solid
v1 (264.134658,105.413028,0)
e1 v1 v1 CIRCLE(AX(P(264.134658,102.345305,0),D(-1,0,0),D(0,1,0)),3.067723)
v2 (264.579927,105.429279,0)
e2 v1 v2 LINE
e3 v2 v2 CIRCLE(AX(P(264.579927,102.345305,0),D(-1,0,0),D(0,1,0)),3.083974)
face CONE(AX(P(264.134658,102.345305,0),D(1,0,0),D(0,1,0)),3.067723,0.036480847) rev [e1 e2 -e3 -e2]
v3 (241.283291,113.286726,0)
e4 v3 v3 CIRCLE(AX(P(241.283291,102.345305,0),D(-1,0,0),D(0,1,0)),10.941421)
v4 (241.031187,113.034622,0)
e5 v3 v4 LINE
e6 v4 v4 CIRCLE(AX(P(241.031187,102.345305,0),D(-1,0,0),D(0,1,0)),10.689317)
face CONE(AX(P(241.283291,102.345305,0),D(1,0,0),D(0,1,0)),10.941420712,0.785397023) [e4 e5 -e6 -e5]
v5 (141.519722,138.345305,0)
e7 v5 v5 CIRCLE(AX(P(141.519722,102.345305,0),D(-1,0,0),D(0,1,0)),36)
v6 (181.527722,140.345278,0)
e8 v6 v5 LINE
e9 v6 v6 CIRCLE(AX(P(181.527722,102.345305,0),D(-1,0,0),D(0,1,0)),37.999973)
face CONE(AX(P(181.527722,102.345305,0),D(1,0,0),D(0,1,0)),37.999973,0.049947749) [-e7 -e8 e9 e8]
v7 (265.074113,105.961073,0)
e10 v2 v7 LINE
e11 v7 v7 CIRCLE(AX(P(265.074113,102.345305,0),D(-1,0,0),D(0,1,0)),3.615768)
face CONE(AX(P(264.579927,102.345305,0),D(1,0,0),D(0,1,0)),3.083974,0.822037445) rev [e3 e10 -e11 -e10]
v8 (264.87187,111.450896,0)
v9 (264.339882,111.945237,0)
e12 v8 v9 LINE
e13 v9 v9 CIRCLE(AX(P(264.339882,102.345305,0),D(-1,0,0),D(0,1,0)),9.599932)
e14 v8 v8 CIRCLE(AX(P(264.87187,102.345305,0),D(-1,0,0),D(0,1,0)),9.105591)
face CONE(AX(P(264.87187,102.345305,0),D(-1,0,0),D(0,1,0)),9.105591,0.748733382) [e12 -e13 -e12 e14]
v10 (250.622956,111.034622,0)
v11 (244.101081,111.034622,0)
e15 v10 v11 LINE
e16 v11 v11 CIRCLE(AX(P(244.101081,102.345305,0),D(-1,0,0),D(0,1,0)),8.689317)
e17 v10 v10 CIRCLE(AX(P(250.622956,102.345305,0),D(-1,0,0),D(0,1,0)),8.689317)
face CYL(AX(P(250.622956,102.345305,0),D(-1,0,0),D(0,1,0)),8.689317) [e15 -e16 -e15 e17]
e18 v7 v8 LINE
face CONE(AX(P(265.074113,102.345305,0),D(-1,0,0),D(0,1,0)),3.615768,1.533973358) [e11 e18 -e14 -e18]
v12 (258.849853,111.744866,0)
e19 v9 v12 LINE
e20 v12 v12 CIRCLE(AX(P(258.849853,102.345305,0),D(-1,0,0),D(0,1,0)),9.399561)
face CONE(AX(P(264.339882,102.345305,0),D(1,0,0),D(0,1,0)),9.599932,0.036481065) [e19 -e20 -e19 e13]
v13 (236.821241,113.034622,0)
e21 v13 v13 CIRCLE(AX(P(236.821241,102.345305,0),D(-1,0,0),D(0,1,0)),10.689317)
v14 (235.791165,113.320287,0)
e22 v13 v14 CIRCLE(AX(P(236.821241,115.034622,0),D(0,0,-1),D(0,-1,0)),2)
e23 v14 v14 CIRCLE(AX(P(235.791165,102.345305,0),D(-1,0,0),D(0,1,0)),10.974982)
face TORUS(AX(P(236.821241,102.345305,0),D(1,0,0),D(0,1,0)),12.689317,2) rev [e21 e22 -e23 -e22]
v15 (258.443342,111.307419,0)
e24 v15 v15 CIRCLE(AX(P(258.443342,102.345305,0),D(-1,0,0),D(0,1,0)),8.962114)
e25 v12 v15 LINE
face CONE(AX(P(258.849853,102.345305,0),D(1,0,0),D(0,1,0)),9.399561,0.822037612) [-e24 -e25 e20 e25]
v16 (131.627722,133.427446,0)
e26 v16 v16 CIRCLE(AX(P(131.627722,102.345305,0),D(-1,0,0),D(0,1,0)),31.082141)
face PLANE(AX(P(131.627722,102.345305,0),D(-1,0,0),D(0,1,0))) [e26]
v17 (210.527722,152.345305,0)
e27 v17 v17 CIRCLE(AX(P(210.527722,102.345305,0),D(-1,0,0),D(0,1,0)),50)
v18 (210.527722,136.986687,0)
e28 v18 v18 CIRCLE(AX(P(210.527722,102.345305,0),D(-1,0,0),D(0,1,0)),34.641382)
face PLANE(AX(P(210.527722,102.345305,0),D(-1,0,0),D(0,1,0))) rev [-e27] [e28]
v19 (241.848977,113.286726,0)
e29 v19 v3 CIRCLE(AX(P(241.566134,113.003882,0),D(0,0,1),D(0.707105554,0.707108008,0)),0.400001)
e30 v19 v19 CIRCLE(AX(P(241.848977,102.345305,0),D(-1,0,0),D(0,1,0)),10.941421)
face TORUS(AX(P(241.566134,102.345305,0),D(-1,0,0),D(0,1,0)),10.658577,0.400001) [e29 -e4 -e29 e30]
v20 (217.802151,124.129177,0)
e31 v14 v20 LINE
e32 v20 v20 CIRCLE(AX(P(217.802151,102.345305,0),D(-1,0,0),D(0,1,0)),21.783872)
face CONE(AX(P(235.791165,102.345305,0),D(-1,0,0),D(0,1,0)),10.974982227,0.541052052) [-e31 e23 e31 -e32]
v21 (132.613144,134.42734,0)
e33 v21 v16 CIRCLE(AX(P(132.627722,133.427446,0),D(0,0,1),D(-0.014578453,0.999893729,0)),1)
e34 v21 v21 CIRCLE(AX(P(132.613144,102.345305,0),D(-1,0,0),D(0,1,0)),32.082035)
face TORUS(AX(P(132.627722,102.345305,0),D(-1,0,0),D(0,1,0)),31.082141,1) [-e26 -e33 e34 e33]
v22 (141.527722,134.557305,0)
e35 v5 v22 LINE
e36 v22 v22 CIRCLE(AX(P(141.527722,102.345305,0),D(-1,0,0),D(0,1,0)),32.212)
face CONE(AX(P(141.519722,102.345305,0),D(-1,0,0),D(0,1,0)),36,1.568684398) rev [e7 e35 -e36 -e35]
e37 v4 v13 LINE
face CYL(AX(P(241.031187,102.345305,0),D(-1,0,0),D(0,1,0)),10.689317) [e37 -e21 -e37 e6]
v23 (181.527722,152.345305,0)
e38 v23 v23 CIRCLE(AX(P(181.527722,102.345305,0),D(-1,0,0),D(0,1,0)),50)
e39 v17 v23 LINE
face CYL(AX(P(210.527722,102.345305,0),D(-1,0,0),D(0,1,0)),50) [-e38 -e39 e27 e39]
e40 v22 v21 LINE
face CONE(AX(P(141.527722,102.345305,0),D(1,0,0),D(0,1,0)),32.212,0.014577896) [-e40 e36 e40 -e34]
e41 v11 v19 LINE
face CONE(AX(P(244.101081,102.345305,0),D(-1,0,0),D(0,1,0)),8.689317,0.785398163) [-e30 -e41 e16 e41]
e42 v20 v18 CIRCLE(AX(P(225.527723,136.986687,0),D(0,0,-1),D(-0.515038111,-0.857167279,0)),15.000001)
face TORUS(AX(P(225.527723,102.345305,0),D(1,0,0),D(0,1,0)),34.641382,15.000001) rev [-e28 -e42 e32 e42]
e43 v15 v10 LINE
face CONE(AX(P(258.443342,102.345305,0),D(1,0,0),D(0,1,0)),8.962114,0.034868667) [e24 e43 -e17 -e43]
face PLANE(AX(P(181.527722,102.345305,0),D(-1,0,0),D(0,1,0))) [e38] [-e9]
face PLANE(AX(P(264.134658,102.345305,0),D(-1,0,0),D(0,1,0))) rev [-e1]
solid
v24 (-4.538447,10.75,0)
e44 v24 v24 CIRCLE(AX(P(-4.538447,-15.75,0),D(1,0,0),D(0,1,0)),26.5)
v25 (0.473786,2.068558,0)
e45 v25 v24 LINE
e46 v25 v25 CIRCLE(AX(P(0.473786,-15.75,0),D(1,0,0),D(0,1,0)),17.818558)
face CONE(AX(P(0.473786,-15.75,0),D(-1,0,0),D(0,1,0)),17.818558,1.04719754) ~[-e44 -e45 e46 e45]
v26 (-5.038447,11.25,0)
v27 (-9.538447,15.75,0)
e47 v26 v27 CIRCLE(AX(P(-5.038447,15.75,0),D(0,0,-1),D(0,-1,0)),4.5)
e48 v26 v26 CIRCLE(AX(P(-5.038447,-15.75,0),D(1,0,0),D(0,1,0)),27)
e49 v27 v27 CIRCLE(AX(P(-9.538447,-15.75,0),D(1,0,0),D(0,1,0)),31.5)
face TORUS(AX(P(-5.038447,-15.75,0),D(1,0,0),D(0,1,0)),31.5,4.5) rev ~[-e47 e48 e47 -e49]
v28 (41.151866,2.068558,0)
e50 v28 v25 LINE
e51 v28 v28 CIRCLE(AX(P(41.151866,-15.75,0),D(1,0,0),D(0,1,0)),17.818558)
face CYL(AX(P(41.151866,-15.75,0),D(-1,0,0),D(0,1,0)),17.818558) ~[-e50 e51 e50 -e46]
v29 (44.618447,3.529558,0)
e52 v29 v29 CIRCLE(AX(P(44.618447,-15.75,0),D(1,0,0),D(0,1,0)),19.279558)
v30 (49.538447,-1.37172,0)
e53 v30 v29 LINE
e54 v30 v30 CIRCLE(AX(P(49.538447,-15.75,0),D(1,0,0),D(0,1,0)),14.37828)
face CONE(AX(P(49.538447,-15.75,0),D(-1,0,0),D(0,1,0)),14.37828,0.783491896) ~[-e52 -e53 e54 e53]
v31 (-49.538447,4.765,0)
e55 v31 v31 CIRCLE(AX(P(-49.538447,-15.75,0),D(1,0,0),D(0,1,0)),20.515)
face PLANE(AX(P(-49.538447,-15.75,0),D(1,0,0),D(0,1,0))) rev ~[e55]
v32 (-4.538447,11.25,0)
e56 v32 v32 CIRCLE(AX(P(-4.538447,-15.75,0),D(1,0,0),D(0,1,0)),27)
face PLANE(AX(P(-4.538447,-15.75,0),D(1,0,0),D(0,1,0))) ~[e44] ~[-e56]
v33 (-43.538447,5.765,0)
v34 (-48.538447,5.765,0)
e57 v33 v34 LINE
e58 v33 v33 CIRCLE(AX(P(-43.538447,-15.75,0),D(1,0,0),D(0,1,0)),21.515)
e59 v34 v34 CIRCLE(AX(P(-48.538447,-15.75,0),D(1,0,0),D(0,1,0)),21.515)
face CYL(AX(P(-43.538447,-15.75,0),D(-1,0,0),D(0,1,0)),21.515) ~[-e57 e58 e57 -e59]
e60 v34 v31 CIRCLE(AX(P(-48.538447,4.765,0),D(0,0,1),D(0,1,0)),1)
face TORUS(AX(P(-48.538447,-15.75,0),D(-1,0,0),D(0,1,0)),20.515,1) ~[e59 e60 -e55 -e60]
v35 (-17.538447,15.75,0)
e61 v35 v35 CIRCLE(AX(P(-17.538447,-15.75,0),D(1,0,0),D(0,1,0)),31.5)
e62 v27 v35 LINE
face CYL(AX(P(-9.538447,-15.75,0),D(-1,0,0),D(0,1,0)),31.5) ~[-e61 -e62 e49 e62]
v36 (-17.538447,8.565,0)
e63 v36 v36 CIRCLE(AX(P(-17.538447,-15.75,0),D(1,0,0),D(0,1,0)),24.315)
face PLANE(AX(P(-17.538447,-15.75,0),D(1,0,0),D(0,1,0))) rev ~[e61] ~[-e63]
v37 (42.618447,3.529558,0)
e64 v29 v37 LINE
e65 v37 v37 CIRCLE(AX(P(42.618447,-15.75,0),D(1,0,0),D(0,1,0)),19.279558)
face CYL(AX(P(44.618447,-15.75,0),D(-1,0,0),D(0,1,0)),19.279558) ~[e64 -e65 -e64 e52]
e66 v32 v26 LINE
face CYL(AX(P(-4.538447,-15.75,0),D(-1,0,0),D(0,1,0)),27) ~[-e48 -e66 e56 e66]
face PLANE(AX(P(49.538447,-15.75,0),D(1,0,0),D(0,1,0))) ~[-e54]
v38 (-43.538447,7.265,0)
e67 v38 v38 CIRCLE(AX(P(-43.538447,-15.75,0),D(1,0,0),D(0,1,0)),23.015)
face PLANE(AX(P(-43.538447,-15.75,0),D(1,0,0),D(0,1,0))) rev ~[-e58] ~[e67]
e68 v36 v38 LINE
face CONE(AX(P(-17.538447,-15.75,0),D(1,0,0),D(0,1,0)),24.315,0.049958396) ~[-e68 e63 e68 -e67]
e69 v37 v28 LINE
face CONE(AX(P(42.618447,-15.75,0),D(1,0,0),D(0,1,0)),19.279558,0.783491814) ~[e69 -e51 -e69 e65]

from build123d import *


# Not quite as in the source:
# - ends of sketch curves that miss each other by under 0.0002 mm in the source are joined


with BuildPart() as f1:
    # F0 (on Top) → F1 (revolve)
    with BuildSketch(Plane.XY):
        with BuildLine():
            Line((210.527722, 136.986687), (210.527722, 152.345305))
            Line((210.527722, 152.345305), (181.527722, 152.345305))
            Line((181.527722, 152.345305), (181.527722, 140.345278))
            Line((181.527722, 140.345278), (141.519722, 138.345305))
            Line((141.519722, 138.345305), (141.527722, 134.557305))
            Line((141.527722, 134.557305), (132.613144, 134.42734))
            ThreePointArc((132.613144, 134.42734), (131.9154797673, 134.1293797589), (131.627722, 133.427446))
            Line((131.627722, 133.427446), (131.627722, 102.345305))
            Line((131.627722, 102.345305), (264.134658, 102.345305))
            Line((264.134658, 102.345305), (264.134658, 105.413028))
            Line((264.134658, 105.413028), (264.579927, 105.429279))
            Line((264.579927, 105.429279), (265.074113, 105.961073))
            Line((265.074113, 105.961073), (264.87187, 111.450896))
            Line((264.87187, 111.450896), (264.339882, 111.945237))
            Line((264.339882, 111.945237), (258.849853, 111.744866))
            Line((258.849853, 111.744866), (258.443342, 111.307419))
            Line((258.443342, 111.307419), (250.622956, 111.034622))
            Line((250.622956, 111.034622), (244.101081, 111.034622))
            Line((244.101081, 111.034622), (241.848977, 113.286726))
            ThreePointArc((241.848977, 113.286726), (241.566134, 113.403883), (241.2832912875, 113.2867257125))
            Line((241.2832912875, 113.2867257125), (241.031187, 113.034622))
            Line((241.031187, 113.034622), (236.821241, 113.034622))
            ThreePointArc((236.821241, 113.034622), (236.2867644086, 113.107361049), (235.7911651362, 113.3202872267))
            Line((235.7911651362, 113.3202872267), (217.802151, 124.129177))
            ThreePointArc((217.802151, 124.129177), (212.4723866491, 129.6003334426), (210.527722, 136.986687))
        make_face()
    revolve(axis=Axis((197.88119, 102.345305, 0), (-1, 0, 0)))


with BuildPart() as f3:
    # F2 (on Top) → F3 (revolve)
    with BuildSketch(Plane.XY):
        with BuildLine():
            Line((-49.538447, 4.765), (-49.538447, -15.75))
            Line((-49.538447, -15.75), (49.538447, -15.75))
            Line((49.538447, -15.75), (49.538447, -1.37172))
            Line((49.538447, -1.37172), (44.618447, 3.529558))
            Line((44.618447, 3.529558), (42.618447, 3.529558))
            Line((42.618447, 3.529558), (41.151866, 2.068558))
            Line((41.151866, 2.068558), (0.473786, 2.068558))
            Line((0.473786, 2.068558), (-4.538447, 10.75))
            Line((-4.538447, 10.75), (-4.538447, 11.25))
            Line((-4.538447, 11.25), (-5.038447, 11.25))
            ThreePointArc((-5.038447, 11.25), (-8.2204275153, 12.5680194847), (-9.538447, 15.75))
            Line((-9.538447, 15.75), (-17.538447, 15.75))
            Line((-17.538447, 15.75), (-17.538447, 8.565))
            Line((-17.538447, 8.565), (-43.538447, 7.265))
            Line((-43.538447, 7.265), (-43.538447, 5.765))
            Line((-43.538447, 5.765), (-48.538447, 5.765))
            ThreePointArc((-48.538447, 5.765), (-49.2455537812, 5.4721067812), (-49.538447, 4.765))
        make_face()
    revolve(axis=Axis((0, -15.75, 0), (1, 0, 0)))


solid = Compound([f1.part, f3.part])
